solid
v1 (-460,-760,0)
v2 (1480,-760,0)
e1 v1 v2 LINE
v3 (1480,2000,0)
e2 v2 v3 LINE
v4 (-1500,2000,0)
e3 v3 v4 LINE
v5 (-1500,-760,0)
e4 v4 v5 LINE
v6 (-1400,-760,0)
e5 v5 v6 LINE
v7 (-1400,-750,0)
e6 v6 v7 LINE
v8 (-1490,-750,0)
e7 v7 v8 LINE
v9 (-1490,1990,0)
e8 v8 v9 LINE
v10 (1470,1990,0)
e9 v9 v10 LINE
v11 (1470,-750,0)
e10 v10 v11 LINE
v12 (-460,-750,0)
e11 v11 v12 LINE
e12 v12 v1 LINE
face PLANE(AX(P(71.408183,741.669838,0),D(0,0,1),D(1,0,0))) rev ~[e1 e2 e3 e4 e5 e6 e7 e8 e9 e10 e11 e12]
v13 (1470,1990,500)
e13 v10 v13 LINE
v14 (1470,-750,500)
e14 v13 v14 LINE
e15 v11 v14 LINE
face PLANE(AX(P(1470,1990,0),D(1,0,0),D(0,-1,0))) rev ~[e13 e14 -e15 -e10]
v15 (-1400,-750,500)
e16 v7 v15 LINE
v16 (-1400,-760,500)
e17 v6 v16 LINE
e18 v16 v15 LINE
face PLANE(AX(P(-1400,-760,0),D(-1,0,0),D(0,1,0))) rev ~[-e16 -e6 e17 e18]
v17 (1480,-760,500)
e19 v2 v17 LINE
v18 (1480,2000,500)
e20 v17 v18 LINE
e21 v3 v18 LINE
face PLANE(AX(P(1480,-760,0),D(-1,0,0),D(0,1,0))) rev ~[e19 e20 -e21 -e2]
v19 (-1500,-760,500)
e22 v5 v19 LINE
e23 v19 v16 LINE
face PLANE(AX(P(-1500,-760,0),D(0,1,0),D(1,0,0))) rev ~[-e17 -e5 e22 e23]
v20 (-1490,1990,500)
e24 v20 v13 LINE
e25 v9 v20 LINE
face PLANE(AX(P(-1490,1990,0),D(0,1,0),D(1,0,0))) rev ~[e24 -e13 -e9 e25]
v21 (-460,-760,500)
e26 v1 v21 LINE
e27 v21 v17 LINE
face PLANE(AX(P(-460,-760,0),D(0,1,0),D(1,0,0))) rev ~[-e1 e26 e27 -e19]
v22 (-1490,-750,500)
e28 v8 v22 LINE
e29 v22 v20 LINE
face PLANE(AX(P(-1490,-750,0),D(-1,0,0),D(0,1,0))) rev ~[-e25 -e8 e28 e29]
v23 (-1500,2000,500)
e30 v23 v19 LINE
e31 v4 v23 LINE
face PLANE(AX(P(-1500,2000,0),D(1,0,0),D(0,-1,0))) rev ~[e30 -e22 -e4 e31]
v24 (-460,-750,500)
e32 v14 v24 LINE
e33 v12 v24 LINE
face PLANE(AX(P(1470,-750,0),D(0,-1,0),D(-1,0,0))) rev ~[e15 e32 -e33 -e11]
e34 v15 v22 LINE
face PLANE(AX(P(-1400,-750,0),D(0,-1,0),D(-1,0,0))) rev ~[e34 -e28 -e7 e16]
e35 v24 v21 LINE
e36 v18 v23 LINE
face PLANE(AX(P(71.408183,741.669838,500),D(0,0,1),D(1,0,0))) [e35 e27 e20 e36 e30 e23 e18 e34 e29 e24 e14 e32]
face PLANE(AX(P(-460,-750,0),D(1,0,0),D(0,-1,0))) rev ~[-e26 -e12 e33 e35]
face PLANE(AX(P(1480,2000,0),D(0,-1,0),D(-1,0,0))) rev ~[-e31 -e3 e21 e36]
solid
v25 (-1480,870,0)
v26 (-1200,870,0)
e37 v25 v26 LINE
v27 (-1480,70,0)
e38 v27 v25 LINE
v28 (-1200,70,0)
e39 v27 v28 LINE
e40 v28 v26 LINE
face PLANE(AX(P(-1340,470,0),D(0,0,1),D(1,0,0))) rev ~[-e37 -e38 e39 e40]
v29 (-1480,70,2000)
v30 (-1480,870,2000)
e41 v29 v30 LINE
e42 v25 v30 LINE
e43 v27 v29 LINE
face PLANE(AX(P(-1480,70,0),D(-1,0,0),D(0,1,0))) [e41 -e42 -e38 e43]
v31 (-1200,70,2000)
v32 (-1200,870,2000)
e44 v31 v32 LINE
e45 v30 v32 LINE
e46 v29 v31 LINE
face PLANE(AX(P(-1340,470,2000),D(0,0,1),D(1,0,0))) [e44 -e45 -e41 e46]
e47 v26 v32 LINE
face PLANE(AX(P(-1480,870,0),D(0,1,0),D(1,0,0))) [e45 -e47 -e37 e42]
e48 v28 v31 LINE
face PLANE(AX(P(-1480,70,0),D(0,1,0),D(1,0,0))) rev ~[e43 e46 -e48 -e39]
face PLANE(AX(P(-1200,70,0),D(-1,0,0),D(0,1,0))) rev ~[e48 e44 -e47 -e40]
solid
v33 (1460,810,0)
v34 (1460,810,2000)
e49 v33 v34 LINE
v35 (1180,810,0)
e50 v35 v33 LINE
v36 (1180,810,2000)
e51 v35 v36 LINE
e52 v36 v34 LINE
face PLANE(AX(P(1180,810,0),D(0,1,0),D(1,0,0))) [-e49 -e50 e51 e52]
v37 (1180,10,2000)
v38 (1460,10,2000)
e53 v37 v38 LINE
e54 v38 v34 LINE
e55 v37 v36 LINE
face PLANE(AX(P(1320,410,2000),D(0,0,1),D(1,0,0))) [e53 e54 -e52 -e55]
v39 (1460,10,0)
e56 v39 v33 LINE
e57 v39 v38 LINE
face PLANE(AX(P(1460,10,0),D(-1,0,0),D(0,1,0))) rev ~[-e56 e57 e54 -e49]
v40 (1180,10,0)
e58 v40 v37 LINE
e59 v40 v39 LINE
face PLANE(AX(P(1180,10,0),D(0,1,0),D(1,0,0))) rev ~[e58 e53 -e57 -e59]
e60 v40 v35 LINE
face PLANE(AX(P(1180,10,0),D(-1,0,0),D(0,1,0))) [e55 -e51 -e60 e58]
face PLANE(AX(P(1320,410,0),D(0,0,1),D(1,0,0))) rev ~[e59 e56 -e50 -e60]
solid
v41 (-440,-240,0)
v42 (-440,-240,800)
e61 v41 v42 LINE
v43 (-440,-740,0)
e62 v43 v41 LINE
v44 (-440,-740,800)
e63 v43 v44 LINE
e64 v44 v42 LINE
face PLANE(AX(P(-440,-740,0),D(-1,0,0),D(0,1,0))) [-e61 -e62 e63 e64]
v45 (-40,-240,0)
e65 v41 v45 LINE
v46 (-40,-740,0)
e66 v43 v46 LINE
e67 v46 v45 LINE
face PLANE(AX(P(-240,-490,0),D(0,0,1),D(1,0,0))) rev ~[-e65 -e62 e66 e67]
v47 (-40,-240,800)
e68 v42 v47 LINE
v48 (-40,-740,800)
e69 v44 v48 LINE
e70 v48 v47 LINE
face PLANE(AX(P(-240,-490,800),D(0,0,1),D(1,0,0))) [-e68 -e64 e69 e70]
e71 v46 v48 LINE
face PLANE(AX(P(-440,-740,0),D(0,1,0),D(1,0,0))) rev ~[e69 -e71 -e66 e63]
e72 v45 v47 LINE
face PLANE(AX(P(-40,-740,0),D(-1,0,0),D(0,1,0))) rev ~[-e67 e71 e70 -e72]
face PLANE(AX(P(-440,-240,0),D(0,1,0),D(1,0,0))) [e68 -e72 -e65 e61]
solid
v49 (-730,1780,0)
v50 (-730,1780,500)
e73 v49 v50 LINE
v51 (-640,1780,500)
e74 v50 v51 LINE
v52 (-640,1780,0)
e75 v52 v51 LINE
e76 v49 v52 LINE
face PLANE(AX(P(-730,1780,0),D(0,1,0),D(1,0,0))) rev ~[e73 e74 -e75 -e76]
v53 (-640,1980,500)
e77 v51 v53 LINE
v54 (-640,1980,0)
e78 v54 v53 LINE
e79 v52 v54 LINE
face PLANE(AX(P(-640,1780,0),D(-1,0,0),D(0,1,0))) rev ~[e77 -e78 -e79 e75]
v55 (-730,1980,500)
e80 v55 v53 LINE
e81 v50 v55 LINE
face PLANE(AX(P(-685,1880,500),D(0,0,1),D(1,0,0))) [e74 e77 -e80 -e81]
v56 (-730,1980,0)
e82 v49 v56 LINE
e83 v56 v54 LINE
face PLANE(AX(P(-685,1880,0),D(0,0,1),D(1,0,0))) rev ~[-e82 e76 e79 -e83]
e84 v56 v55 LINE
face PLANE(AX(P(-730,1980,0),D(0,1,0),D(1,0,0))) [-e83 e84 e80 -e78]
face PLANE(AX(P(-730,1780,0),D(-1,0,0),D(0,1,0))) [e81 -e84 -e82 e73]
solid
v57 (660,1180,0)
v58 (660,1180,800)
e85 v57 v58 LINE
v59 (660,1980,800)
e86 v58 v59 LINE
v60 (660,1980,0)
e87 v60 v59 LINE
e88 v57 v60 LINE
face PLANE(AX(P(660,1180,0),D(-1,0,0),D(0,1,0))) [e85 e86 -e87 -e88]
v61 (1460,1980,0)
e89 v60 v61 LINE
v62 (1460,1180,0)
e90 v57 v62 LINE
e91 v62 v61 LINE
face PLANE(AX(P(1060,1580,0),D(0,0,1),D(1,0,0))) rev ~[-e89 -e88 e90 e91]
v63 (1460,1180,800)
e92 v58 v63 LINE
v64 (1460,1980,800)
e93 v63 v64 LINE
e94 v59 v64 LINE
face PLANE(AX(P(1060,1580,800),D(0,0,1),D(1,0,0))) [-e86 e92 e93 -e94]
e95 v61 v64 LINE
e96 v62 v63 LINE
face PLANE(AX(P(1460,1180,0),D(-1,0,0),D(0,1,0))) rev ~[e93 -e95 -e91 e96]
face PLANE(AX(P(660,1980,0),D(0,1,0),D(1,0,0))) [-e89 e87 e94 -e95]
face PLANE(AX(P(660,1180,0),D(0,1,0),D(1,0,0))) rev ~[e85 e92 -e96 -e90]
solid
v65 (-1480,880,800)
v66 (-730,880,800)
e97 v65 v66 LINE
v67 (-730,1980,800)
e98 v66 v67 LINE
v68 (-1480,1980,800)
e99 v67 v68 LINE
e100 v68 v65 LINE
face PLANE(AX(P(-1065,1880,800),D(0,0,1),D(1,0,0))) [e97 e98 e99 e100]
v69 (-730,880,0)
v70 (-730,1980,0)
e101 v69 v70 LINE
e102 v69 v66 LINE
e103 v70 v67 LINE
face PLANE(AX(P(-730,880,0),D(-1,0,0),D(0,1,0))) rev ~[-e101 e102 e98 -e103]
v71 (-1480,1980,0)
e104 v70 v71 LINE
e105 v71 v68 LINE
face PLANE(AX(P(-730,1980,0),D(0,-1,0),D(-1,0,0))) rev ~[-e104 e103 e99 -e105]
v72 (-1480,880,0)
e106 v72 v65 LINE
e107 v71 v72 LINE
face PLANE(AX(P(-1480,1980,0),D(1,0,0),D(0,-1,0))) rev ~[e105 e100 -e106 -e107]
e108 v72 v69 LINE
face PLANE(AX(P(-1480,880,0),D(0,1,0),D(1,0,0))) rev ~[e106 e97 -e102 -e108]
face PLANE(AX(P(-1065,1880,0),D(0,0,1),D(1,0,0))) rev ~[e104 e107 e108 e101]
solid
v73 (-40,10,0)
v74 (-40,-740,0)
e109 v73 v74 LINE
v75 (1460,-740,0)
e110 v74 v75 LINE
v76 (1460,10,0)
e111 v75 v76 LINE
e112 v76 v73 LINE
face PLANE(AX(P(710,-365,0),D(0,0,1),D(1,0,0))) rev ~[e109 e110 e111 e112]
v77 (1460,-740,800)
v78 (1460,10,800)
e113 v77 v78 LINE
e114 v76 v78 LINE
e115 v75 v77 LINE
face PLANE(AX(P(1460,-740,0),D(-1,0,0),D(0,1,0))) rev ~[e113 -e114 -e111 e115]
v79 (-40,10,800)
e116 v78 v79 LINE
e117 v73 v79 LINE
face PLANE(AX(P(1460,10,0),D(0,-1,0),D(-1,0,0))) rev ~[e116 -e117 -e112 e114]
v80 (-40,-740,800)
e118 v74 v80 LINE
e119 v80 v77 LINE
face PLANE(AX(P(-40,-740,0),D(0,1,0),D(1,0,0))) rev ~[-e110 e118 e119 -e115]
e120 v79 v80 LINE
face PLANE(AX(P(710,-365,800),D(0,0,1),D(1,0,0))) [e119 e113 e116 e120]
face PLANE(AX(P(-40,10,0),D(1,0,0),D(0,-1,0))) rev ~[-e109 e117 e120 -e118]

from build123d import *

# Parameters (mm, degrees)
F1_DEPTH = 500
F0_W     = 280
F0_H     = 800
F2_DEPTH = 2000
F0_W_2   = 90
F0_H_2   = 200
F3_DEPTH = 500
F0_W_3   = 670
F4_DEPTH = 800
F5_DEPTH = 800
F6_DEPTH = 2000
F0_W_4   = 800
F7_DEPTH = 800
F0_W_5   = 400
F0_H_3   = 500
F8_DEPTH = 800


with BuildPart() as f1:
    # F0 (on Top) → F1 (new body)
    with BuildSketch(Plane.XY):
        Polygon((-1490, -750), (-1490, 1990), (1470, 1990), (1470, -750), (-460, -750), (-460, -760), (1480, -760), (1480, 2000), (-1500, 2000), (-1500, -760), (-1400, -760), (-1400, -750), align=None)
    extrude(amount=F1_DEPTH)


with BuildPart() as f2:
    # F0 (on Top) → F2 (new body)
    with BuildSketch(Plane.XY):
        with Locations((-1340, 470)):
            Rectangle(F0_W, F0_H)
    extrude(amount=F2_DEPTH)


with BuildPart() as f3:
    # F0 (on Top) → F3 (new body)
    with BuildSketch(Plane.XY):
        with Locations((-685, 1880)):
            Rectangle(F0_W_2, F0_H_2)
    extrude(amount=F3_DEPTH)


with BuildPart() as f4:
    # F0 (on Top) → F4 (new body)
    with BuildSketch(Plane.XY):
        with Locations((-1065, 1880)):
            Rectangle(F0_W_3, F0_H_2)
        Polygon((-1400, 1780), (-1400, 1980), (-1480, 1980), (-1480, 880), (-730, 880), (-730, 1780), align=None)
    extrude(amount=F4_DEPTH)


with BuildPart() as f5:
    # F0 (on Top) → F5 (new body)
    with BuildSketch(Plane.XY):
        Polygon((1460, 10), (1180, 10), (-40, 10), (-40, -240), (-40, -740), (1460, -740), align=None)
    extrude(amount=F5_DEPTH)


with BuildPart() as f6:
    # F0 (on Top) → F6 (new body)
    with BuildSketch(Plane.XY):
        with Locations((1320, 410)):
            Rectangle(F0_W, F0_H)
    extrude(amount=F6_DEPTH)


with BuildPart() as f7:
    # F0 (on Top) → F7 (new body)
    with BuildSketch(Plane.XY):
        with Locations((1060, 1580)):
            Rectangle(F0_W_4, F0_H)
    extrude(amount=F7_DEPTH)


with BuildPart() as f8:
    # F0 (on Top) → F8 (new body)
    with BuildSketch(Plane.XY):
        with Locations((-240, -490)):
            Rectangle(F0_W_5, F0_H_3)
    extrude(amount=F8_DEPTH)


solid = Compound([f1.part, f2.part, f3.part, f4.part, f5.part, f6.part, f7.part, f8.part])
